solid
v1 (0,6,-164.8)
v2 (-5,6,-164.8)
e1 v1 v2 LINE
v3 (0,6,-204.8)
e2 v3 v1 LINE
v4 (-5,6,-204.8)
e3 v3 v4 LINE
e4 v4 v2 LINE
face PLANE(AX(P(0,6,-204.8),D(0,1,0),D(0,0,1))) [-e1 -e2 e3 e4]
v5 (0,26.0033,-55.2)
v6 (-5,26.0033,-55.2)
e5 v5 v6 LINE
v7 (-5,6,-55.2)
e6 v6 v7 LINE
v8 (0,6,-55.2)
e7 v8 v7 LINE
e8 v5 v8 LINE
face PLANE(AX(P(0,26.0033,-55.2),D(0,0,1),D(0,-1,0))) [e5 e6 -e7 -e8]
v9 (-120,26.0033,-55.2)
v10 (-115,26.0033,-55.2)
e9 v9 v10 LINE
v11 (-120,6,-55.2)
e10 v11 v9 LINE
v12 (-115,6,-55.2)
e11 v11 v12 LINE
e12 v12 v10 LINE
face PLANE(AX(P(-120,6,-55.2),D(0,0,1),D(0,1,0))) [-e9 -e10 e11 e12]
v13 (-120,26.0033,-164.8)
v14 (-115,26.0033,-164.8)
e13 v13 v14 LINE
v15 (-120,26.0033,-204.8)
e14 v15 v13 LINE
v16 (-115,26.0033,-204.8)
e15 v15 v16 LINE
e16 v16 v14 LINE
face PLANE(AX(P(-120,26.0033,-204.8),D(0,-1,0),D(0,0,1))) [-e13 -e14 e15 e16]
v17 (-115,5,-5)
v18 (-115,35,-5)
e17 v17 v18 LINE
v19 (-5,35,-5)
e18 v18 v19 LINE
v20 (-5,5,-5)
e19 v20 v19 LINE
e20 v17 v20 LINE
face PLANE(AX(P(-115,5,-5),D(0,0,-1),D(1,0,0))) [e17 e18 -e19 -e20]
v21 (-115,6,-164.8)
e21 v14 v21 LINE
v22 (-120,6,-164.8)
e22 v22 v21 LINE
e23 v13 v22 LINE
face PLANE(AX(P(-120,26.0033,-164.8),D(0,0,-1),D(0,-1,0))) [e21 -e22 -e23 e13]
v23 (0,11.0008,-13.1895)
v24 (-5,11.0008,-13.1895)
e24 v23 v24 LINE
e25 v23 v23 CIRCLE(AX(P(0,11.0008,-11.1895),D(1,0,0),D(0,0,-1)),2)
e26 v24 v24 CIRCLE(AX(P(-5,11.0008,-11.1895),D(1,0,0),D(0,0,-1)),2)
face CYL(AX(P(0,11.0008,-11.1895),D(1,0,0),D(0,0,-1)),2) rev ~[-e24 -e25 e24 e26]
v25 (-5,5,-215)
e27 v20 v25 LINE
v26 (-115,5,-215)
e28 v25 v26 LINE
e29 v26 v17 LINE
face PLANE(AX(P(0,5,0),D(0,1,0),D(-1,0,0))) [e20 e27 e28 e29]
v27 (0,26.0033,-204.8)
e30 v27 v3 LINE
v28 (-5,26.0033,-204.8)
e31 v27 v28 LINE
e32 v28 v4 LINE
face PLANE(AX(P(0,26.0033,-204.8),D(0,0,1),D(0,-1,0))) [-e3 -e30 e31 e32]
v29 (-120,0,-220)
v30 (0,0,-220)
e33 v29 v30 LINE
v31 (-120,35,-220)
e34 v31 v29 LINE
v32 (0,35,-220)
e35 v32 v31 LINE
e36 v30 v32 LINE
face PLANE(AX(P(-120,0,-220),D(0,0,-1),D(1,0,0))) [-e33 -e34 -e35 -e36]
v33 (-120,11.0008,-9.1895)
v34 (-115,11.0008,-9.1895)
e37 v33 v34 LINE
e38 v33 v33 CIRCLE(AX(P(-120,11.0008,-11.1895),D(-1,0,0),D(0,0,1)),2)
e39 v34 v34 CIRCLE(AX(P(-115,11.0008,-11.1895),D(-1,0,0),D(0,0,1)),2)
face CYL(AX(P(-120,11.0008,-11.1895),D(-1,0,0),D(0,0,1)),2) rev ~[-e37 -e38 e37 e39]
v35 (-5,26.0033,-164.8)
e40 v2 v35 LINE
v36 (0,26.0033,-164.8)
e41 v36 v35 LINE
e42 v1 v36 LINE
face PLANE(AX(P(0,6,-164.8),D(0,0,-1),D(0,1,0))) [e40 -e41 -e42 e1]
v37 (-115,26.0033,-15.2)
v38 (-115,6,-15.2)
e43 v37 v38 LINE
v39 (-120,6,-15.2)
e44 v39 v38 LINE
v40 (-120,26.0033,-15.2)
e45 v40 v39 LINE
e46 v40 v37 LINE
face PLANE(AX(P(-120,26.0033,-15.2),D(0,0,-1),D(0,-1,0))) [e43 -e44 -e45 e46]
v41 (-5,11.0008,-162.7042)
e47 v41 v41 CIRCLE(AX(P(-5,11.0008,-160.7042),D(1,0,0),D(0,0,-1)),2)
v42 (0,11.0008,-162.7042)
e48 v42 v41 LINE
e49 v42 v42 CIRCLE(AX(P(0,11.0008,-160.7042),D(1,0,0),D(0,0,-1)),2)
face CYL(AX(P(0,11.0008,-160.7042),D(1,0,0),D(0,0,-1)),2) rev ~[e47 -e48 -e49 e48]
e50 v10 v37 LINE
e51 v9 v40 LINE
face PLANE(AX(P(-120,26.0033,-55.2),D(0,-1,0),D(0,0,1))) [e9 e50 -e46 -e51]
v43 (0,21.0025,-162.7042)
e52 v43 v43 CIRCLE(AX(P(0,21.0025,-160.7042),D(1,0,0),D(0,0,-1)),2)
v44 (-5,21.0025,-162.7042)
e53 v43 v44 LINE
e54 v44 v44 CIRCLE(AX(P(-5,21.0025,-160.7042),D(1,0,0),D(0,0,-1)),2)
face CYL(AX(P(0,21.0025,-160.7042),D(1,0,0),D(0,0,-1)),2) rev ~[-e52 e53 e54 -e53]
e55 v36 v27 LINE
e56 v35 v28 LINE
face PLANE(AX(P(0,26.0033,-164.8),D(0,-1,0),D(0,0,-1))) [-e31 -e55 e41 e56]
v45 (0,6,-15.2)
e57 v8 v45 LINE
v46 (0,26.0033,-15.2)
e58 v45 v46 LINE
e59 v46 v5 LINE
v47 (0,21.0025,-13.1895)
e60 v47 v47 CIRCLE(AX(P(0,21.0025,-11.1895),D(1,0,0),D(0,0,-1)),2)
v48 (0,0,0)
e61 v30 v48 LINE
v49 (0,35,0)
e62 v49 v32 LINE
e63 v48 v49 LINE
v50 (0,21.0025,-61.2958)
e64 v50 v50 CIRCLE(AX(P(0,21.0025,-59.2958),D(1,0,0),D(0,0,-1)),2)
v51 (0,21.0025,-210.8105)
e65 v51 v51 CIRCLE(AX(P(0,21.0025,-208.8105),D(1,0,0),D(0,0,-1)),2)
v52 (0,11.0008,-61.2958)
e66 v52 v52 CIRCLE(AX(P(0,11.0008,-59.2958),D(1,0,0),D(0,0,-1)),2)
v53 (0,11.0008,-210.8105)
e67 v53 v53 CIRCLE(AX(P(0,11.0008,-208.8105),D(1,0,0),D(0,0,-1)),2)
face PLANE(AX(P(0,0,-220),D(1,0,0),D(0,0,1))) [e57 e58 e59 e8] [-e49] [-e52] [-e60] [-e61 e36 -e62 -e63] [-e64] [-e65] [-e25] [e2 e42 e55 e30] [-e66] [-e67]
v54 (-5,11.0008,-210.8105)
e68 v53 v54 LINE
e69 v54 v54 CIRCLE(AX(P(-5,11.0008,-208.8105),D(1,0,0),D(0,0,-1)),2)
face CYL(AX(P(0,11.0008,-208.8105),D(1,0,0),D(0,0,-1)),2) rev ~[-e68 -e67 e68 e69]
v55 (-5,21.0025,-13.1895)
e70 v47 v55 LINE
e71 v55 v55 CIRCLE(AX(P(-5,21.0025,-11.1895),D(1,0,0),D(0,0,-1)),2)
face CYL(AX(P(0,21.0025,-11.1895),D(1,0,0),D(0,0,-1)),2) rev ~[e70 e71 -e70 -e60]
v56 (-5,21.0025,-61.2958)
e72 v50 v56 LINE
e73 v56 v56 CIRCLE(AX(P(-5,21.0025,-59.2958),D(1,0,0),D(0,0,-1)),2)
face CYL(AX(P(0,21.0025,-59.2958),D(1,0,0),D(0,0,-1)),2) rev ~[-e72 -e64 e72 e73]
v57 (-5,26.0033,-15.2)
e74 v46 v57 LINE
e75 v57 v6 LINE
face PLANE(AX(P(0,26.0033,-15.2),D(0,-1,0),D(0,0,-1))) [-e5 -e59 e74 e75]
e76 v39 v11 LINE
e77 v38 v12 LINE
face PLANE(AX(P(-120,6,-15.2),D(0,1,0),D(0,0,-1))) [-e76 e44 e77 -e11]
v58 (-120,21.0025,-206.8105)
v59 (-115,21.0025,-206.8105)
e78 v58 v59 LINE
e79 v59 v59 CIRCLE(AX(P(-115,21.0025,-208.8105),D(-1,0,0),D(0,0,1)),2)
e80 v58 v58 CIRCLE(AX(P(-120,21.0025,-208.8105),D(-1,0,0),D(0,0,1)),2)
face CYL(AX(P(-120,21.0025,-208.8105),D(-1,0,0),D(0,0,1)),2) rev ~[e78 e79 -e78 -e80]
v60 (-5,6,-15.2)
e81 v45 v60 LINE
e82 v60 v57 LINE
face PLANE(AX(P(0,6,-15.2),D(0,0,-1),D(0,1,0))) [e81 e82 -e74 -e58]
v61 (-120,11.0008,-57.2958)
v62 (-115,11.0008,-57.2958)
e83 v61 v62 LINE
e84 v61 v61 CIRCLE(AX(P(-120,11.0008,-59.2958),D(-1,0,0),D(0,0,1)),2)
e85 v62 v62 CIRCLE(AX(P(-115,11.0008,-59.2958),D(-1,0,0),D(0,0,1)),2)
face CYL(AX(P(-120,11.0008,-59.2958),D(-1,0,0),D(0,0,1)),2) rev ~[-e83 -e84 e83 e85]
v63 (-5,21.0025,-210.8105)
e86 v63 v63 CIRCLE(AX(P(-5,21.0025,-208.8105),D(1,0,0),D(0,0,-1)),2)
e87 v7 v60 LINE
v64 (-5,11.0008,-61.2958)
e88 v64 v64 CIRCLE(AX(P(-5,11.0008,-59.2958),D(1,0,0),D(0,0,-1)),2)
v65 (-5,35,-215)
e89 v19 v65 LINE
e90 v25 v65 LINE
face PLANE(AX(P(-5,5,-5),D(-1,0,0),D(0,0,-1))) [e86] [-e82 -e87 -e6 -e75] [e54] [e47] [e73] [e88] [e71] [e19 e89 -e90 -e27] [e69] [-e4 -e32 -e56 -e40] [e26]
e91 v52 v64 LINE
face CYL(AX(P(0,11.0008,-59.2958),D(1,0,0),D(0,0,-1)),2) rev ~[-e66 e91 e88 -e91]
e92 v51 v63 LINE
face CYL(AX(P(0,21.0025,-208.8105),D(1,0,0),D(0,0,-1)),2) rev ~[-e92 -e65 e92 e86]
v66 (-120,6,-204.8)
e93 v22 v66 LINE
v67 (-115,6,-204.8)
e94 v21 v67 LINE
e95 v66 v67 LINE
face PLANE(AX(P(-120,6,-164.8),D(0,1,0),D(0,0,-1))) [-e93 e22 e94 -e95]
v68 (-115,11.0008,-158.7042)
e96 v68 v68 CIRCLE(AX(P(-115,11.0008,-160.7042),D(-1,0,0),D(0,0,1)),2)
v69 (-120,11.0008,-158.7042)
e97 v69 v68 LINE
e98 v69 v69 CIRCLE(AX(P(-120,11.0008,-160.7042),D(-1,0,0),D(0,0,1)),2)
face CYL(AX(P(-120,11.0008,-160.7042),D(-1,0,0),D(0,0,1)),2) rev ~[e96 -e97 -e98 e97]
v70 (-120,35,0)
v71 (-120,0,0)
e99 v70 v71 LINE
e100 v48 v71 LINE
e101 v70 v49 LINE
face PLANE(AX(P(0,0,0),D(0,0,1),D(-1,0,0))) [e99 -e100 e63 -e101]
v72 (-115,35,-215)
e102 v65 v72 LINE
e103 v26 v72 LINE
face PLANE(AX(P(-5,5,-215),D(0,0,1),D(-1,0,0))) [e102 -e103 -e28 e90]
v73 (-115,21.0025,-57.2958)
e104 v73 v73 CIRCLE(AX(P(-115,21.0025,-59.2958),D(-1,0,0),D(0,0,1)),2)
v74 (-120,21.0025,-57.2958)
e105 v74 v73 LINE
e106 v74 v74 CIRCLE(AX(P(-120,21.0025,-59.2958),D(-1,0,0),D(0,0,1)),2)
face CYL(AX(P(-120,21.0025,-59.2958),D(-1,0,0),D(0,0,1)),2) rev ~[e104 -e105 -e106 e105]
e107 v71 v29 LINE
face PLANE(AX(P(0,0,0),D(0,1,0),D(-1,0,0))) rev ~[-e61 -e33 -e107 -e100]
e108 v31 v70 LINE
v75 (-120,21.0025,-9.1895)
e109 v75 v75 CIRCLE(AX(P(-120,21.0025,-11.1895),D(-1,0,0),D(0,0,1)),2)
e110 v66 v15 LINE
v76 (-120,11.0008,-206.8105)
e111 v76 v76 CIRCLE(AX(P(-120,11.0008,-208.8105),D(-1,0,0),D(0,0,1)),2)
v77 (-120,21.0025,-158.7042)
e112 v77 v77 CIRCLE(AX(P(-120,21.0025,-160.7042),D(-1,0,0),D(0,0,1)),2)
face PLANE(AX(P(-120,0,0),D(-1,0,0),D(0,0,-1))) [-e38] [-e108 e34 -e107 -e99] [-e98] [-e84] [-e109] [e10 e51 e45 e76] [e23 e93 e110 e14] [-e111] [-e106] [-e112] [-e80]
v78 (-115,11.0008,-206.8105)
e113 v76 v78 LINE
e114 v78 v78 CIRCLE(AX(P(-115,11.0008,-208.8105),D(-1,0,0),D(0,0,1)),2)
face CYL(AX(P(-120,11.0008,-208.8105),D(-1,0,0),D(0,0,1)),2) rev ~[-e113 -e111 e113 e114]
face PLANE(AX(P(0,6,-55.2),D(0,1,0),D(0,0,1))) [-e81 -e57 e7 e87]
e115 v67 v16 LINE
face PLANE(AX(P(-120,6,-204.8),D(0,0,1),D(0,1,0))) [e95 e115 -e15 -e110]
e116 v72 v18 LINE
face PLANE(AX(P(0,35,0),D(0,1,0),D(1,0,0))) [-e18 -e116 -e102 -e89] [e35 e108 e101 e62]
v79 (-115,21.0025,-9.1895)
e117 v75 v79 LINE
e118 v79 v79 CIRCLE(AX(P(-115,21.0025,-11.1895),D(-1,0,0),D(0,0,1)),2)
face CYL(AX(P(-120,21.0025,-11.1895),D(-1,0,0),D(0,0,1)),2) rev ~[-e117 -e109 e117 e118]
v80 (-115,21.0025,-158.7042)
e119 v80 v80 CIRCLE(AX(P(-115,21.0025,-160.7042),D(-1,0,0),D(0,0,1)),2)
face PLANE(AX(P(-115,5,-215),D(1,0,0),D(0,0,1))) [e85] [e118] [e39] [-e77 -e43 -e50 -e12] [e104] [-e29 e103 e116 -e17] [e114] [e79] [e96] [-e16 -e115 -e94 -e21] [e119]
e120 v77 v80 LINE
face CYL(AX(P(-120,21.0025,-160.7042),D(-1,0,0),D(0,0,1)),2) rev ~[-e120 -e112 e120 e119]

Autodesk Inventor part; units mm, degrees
ref_plane "YZ Plane" through (0, 0, 0) normal (1, 0, 0) x (0, 1, 0)
ref_plane "XZ Plane" through (0, 0, 0) normal (0, 1, 0) x (-1, 0, 0)
ref_plane "XY Plane" through (0, 0, 0) normal (0, 0, 1) x (1, 0, 0)
sketch "servo" plane through (0, 0, 0) normal (0, 0, 1) x (1, 0, 0)
  line L0 (0, -20.0033) -> (0, 0)
  line L1 (54.4, 0) -> (54.4, -20.0033)
  line L2 (0, 0) -> (54.4, 0)
  line L3 (54.4, 0) -> (54.4, -20.0033)
  line L4 (54.4, -20.0033) -> (0, -20.0033)
  line L5 (0, -20.0033) -> (0, 0)
  circle A0 centre (3.1042, -5.0008) radius 2
  circle A1 centre (3.1042, -5.0008) radius 2
  circle A2 centre (3.1042, -15.0025) radius 2
  circle A3 centre (3.1042, -15.0025) radius 2
  circle A4 centre (51.2105, -15.0025) radius 2
  circle A5 centre (51.2105, -15.0025) radius 2
  circle A6 centre (51.2105, -5.0008) radius 2
  circle A7 centre (51.2105, -5.0008) radius 2
  line L6 (47.2, -20.0033) -> (7.2, -20.0033)
  line L7 (47.2, -20.0033) -> (7.2, -20.0033)
  line L8 (7.2, -20.0033) -> (7.2, 0)
  line L9 (7.2, 0) -> (47.2, 0)
  line L10 (47.2, 0) -> (47.2, -20.0033)
  circle A8 centre (36.7104, -10.0017) radius 2.9
  circle A9 centre (36.7104, -10.0017) radius 2.9
  point P0 (27.5156, -10.5472)
sketch "Sketch1" plane through (0, 0, 0) normal (0, 1, 0) x (-1, 0, 0)
  line L0 (0, 0) -> (120, 0)
  line L1 (120, 0) -> (120, -220)
  line L2 (120, -220) -> (0, -220)
  line L3 (0, -220) -> (0, 0)
  dimension "d0" = 120
  dimension "d1" = 220
extrude "Extrusion1" add sketch "Sketch1" along normal blind 5
sketch "Sketch3" plane through (0, 5, 0) normal (0, 1, 0) x (1, 0, 0)
  line L0 (-120, 0) -> (0, 0) projected
  line L1 (0, 0) -> (0, 220) projected
  line L2 (-120, 0) -> (0, 0)
  line L3 (0, 0) -> (0, 220)
  line L4 (0, 220) -> (-120, 220)
  line L5 (-120, 220) -> (-120, 0)
  line L6 (-115, 5) -> (-5, 5)
  line L7 (-5, 5) -> (-5, 215)
  line L8 (-5, 215) -> (-115, 215)
  line L9 (-115, 215) -> (-115, 5)
  dimension "d4" = 5
  dimension "d5" = 5
  dimension "d6" = 5
  dimension "d7" = 5
extrude "Extrusion2" add sketch "Sketch3" along normal blind 30
sketch "Sketch4" plane through (0, 0, 0) normal (1, 0, 0) x (0, 0, -1)
  line L0 (0, 0) -> (0, 35) projected
  line L1 (220, 0) -> (0, 0) projected
  line L2 (220, 0) -> (220, 35) projected
  line L3 (62.4, 26.0033) -> (62.4, 6)
  line L4 (8, 6) -> (8, 26.0033)
  line L5 (62.4, 6) -> (8, 6)
  line L6 (8, 6) -> (8, 26.0033)
  line L7 (8, 26.0033) -> (62.4, 26.0033)
  line L8 (62.4, 26.0033) -> (62.4, 6)
  circle A0 centre (59.2958, 11.0008) radius 2
  circle A1 centre (59.2958, 11.0008) radius 2
  circle A2 centre (59.2958, 21.0025) radius 2
  circle A3 centre (59.2958, 21.0025) radius 2
  circle A4 centre (11.1895, 21.0025) radius 2
  circle A5 centre (11.1895, 21.0025) radius 2
  circle A6 centre (11.1895, 11.0008) radius 2
  circle A7 centre (11.1895, 11.0008) radius 2
  line L9 (15.2, 26.0033) -> (55.2, 26.0033)
  line L10 (15.2, 26.0033) -> (55.2, 26.0033)
  line L11 (55.2, 26.0033) -> (55.2, 6)
  line L12 (55.2, 6) -> (15.2, 6)
  line L13 (15.2, 6) -> (15.2, 26.0033)
  circle A8 centre (25.6896, 16.0017) radius 2.9
  circle A9 centre (25.6896, 16.0017) radius 2.9
  line L14 (157.6, 6) -> (157.6, 26.0033)
  line L15 (212, 26.0033) -> (212, 6)
  line L16 (157.6, 26.0033) -> (212, 26.0033)
  line L17 (212, 26.0033) -> (212, 6)
  line L18 (212, 6) -> (157.6, 6)
  line L19 (157.6, 6) -> (157.6, 26.0033)
  circle A10 centre (160.7042, 21.0025) radius 2
  circle A11 centre (160.7042, 21.0025) radius 2
  circle A12 centre (160.7042, 11.0008) radius 2
  circle A13 centre (160.7042, 11.0008) radius 2
  circle A14 centre (208.8105, 11.0008) radius 2
  circle A15 centre (208.8105, 11.0008) radius 2
  circle A16 centre (208.8105, 21.0025) radius 2
  circle A17 centre (208.8105, 21.0025) radius 2
  line L20 (204.8, 6) -> (164.8, 6)
  line L21 (204.8, 6) -> (164.8, 6)
  line L22 (164.8, 6) -> (164.8, 26.0033)
  line L23 (164.8, 26.0033) -> (204.8, 26.0033)
  line L24 (204.8, 26.0033) -> (204.8, 6)
  circle A18 centre (194.3104, 16.0017) radius 2.9
  circle A19 centre (194.3104, 16.0017) radius 2.9
  dimension "d10" = 8
  dimension "d11" = 6
  dimension "d12" = 8
  dimension "d13" = 6
sketch "Sketch5" plane through (-120, 0, -220) normal (-1, 0, 0) x (0, 0, 1)
  line L0 (220, 0) -> (0, 0) projected
  line L1 (0, 0) -> (0, 35) projected
  line L2 (220, 0) -> (220, 35) projected
  line L3 (157.6, 6) -> (157.6, 26.0033)
  line L4 (212, 26.0033) -> (212, 6)
  line L5 (157.6, 26.0033) -> (212, 26.0033)
  line L6 (212, 26.0033) -> (212, 6)
  line L7 (212, 6) -> (157.6, 6)
  line L8 (157.6, 6) -> (157.6, 26.0033)
  circle A0 centre (160.7042, 21.0025) radius 2
  circle A1 centre (160.7042, 21.0025) radius 2
  circle A2 centre (160.7042, 11.0008) radius 2
  circle A3 centre (160.7042, 11.0008) radius 2
  circle A4 centre (208.8105, 11.0008) radius 2
  circle A5 centre (208.8105, 11.0008) radius 2
  circle A6 centre (208.8105, 21.0025) radius 2
  circle A7 centre (208.8105, 21.0025) radius 2
  line L9 (204.8, 6) -> (164.8, 6)
  line L10 (204.8, 6) -> (164.8, 6)
  line L11 (164.8, 6) -> (164.8, 26.0033)
  line L12 (164.8, 26.0033) -> (204.8, 26.0033)
  line L13 (204.8, 26.0033) -> (204.8, 6)
  circle A8 centre (194.3104, 16.0017) radius 2.9
  circle A9 centre (194.3104, 16.0017) radius 2.9
  line L14 (62.4, 26.0033) -> (62.4, 6)
  line L15 (8, 6) -> (8, 26.0033)
  line L16 (62.4, 6) -> (8, 6)
  line L17 (8, 6) -> (8, 26.0033)
  line L18 (8, 26.0033) -> (62.4, 26.0033)
  line L19 (62.4, 26.0033) -> (62.4, 6)
  circle A10 centre (59.2958, 11.0008) radius 2
  circle A11 centre (59.2958, 11.0008) radius 2
  circle A12 centre (59.2958, 21.0025) radius 2
  circle A13 centre (59.2958, 21.0025) radius 2
  circle A14 centre (11.1895, 21.0025) radius 2
  circle A15 centre (11.1895, 21.0025) radius 2
  circle A16 centre (11.1895, 11.0008) radius 2
  circle A17 centre (11.1895, 11.0008) radius 2
  line L20 (15.2, 26.0033) -> (55.2, 26.0033)
  line L21 (15.2, 26.0033) -> (55.2, 26.0033)
  line L22 (55.2, 26.0033) -> (55.2, 6)
  line L23 (55.2, 6) -> (15.2, 6)
  line L24 (15.2, 6) -> (15.2, 26.0033)
  circle A18 centre (25.6896, 16.0017) radius 2.9
  circle A19 centre (25.6896, 16.0017) radius 2.9
  dimension "d14" = 6
  dimension "d15" = 8
  dimension "d16" = 6
  dimension "d17" = 8
extrude "Extrusion3" cut sketch "Sketch4" against normal blind 5 contours L11 L5 L13 L7 | A0 | A2 | A4 | A6 | A8 | L22 L16 L24 L18 | A10 | A12 | A14 | A16 | A18
extrude "Extrusion4" cut sketch "Sketch5" against normal blind 5 contours L11 L5 L13 L7 | A0 | A2 | A4 | A6 | A8 | L22 L16 L24 L18 | A10 | A12 | A14 | A16 | A18
properties part number "Tronco"
